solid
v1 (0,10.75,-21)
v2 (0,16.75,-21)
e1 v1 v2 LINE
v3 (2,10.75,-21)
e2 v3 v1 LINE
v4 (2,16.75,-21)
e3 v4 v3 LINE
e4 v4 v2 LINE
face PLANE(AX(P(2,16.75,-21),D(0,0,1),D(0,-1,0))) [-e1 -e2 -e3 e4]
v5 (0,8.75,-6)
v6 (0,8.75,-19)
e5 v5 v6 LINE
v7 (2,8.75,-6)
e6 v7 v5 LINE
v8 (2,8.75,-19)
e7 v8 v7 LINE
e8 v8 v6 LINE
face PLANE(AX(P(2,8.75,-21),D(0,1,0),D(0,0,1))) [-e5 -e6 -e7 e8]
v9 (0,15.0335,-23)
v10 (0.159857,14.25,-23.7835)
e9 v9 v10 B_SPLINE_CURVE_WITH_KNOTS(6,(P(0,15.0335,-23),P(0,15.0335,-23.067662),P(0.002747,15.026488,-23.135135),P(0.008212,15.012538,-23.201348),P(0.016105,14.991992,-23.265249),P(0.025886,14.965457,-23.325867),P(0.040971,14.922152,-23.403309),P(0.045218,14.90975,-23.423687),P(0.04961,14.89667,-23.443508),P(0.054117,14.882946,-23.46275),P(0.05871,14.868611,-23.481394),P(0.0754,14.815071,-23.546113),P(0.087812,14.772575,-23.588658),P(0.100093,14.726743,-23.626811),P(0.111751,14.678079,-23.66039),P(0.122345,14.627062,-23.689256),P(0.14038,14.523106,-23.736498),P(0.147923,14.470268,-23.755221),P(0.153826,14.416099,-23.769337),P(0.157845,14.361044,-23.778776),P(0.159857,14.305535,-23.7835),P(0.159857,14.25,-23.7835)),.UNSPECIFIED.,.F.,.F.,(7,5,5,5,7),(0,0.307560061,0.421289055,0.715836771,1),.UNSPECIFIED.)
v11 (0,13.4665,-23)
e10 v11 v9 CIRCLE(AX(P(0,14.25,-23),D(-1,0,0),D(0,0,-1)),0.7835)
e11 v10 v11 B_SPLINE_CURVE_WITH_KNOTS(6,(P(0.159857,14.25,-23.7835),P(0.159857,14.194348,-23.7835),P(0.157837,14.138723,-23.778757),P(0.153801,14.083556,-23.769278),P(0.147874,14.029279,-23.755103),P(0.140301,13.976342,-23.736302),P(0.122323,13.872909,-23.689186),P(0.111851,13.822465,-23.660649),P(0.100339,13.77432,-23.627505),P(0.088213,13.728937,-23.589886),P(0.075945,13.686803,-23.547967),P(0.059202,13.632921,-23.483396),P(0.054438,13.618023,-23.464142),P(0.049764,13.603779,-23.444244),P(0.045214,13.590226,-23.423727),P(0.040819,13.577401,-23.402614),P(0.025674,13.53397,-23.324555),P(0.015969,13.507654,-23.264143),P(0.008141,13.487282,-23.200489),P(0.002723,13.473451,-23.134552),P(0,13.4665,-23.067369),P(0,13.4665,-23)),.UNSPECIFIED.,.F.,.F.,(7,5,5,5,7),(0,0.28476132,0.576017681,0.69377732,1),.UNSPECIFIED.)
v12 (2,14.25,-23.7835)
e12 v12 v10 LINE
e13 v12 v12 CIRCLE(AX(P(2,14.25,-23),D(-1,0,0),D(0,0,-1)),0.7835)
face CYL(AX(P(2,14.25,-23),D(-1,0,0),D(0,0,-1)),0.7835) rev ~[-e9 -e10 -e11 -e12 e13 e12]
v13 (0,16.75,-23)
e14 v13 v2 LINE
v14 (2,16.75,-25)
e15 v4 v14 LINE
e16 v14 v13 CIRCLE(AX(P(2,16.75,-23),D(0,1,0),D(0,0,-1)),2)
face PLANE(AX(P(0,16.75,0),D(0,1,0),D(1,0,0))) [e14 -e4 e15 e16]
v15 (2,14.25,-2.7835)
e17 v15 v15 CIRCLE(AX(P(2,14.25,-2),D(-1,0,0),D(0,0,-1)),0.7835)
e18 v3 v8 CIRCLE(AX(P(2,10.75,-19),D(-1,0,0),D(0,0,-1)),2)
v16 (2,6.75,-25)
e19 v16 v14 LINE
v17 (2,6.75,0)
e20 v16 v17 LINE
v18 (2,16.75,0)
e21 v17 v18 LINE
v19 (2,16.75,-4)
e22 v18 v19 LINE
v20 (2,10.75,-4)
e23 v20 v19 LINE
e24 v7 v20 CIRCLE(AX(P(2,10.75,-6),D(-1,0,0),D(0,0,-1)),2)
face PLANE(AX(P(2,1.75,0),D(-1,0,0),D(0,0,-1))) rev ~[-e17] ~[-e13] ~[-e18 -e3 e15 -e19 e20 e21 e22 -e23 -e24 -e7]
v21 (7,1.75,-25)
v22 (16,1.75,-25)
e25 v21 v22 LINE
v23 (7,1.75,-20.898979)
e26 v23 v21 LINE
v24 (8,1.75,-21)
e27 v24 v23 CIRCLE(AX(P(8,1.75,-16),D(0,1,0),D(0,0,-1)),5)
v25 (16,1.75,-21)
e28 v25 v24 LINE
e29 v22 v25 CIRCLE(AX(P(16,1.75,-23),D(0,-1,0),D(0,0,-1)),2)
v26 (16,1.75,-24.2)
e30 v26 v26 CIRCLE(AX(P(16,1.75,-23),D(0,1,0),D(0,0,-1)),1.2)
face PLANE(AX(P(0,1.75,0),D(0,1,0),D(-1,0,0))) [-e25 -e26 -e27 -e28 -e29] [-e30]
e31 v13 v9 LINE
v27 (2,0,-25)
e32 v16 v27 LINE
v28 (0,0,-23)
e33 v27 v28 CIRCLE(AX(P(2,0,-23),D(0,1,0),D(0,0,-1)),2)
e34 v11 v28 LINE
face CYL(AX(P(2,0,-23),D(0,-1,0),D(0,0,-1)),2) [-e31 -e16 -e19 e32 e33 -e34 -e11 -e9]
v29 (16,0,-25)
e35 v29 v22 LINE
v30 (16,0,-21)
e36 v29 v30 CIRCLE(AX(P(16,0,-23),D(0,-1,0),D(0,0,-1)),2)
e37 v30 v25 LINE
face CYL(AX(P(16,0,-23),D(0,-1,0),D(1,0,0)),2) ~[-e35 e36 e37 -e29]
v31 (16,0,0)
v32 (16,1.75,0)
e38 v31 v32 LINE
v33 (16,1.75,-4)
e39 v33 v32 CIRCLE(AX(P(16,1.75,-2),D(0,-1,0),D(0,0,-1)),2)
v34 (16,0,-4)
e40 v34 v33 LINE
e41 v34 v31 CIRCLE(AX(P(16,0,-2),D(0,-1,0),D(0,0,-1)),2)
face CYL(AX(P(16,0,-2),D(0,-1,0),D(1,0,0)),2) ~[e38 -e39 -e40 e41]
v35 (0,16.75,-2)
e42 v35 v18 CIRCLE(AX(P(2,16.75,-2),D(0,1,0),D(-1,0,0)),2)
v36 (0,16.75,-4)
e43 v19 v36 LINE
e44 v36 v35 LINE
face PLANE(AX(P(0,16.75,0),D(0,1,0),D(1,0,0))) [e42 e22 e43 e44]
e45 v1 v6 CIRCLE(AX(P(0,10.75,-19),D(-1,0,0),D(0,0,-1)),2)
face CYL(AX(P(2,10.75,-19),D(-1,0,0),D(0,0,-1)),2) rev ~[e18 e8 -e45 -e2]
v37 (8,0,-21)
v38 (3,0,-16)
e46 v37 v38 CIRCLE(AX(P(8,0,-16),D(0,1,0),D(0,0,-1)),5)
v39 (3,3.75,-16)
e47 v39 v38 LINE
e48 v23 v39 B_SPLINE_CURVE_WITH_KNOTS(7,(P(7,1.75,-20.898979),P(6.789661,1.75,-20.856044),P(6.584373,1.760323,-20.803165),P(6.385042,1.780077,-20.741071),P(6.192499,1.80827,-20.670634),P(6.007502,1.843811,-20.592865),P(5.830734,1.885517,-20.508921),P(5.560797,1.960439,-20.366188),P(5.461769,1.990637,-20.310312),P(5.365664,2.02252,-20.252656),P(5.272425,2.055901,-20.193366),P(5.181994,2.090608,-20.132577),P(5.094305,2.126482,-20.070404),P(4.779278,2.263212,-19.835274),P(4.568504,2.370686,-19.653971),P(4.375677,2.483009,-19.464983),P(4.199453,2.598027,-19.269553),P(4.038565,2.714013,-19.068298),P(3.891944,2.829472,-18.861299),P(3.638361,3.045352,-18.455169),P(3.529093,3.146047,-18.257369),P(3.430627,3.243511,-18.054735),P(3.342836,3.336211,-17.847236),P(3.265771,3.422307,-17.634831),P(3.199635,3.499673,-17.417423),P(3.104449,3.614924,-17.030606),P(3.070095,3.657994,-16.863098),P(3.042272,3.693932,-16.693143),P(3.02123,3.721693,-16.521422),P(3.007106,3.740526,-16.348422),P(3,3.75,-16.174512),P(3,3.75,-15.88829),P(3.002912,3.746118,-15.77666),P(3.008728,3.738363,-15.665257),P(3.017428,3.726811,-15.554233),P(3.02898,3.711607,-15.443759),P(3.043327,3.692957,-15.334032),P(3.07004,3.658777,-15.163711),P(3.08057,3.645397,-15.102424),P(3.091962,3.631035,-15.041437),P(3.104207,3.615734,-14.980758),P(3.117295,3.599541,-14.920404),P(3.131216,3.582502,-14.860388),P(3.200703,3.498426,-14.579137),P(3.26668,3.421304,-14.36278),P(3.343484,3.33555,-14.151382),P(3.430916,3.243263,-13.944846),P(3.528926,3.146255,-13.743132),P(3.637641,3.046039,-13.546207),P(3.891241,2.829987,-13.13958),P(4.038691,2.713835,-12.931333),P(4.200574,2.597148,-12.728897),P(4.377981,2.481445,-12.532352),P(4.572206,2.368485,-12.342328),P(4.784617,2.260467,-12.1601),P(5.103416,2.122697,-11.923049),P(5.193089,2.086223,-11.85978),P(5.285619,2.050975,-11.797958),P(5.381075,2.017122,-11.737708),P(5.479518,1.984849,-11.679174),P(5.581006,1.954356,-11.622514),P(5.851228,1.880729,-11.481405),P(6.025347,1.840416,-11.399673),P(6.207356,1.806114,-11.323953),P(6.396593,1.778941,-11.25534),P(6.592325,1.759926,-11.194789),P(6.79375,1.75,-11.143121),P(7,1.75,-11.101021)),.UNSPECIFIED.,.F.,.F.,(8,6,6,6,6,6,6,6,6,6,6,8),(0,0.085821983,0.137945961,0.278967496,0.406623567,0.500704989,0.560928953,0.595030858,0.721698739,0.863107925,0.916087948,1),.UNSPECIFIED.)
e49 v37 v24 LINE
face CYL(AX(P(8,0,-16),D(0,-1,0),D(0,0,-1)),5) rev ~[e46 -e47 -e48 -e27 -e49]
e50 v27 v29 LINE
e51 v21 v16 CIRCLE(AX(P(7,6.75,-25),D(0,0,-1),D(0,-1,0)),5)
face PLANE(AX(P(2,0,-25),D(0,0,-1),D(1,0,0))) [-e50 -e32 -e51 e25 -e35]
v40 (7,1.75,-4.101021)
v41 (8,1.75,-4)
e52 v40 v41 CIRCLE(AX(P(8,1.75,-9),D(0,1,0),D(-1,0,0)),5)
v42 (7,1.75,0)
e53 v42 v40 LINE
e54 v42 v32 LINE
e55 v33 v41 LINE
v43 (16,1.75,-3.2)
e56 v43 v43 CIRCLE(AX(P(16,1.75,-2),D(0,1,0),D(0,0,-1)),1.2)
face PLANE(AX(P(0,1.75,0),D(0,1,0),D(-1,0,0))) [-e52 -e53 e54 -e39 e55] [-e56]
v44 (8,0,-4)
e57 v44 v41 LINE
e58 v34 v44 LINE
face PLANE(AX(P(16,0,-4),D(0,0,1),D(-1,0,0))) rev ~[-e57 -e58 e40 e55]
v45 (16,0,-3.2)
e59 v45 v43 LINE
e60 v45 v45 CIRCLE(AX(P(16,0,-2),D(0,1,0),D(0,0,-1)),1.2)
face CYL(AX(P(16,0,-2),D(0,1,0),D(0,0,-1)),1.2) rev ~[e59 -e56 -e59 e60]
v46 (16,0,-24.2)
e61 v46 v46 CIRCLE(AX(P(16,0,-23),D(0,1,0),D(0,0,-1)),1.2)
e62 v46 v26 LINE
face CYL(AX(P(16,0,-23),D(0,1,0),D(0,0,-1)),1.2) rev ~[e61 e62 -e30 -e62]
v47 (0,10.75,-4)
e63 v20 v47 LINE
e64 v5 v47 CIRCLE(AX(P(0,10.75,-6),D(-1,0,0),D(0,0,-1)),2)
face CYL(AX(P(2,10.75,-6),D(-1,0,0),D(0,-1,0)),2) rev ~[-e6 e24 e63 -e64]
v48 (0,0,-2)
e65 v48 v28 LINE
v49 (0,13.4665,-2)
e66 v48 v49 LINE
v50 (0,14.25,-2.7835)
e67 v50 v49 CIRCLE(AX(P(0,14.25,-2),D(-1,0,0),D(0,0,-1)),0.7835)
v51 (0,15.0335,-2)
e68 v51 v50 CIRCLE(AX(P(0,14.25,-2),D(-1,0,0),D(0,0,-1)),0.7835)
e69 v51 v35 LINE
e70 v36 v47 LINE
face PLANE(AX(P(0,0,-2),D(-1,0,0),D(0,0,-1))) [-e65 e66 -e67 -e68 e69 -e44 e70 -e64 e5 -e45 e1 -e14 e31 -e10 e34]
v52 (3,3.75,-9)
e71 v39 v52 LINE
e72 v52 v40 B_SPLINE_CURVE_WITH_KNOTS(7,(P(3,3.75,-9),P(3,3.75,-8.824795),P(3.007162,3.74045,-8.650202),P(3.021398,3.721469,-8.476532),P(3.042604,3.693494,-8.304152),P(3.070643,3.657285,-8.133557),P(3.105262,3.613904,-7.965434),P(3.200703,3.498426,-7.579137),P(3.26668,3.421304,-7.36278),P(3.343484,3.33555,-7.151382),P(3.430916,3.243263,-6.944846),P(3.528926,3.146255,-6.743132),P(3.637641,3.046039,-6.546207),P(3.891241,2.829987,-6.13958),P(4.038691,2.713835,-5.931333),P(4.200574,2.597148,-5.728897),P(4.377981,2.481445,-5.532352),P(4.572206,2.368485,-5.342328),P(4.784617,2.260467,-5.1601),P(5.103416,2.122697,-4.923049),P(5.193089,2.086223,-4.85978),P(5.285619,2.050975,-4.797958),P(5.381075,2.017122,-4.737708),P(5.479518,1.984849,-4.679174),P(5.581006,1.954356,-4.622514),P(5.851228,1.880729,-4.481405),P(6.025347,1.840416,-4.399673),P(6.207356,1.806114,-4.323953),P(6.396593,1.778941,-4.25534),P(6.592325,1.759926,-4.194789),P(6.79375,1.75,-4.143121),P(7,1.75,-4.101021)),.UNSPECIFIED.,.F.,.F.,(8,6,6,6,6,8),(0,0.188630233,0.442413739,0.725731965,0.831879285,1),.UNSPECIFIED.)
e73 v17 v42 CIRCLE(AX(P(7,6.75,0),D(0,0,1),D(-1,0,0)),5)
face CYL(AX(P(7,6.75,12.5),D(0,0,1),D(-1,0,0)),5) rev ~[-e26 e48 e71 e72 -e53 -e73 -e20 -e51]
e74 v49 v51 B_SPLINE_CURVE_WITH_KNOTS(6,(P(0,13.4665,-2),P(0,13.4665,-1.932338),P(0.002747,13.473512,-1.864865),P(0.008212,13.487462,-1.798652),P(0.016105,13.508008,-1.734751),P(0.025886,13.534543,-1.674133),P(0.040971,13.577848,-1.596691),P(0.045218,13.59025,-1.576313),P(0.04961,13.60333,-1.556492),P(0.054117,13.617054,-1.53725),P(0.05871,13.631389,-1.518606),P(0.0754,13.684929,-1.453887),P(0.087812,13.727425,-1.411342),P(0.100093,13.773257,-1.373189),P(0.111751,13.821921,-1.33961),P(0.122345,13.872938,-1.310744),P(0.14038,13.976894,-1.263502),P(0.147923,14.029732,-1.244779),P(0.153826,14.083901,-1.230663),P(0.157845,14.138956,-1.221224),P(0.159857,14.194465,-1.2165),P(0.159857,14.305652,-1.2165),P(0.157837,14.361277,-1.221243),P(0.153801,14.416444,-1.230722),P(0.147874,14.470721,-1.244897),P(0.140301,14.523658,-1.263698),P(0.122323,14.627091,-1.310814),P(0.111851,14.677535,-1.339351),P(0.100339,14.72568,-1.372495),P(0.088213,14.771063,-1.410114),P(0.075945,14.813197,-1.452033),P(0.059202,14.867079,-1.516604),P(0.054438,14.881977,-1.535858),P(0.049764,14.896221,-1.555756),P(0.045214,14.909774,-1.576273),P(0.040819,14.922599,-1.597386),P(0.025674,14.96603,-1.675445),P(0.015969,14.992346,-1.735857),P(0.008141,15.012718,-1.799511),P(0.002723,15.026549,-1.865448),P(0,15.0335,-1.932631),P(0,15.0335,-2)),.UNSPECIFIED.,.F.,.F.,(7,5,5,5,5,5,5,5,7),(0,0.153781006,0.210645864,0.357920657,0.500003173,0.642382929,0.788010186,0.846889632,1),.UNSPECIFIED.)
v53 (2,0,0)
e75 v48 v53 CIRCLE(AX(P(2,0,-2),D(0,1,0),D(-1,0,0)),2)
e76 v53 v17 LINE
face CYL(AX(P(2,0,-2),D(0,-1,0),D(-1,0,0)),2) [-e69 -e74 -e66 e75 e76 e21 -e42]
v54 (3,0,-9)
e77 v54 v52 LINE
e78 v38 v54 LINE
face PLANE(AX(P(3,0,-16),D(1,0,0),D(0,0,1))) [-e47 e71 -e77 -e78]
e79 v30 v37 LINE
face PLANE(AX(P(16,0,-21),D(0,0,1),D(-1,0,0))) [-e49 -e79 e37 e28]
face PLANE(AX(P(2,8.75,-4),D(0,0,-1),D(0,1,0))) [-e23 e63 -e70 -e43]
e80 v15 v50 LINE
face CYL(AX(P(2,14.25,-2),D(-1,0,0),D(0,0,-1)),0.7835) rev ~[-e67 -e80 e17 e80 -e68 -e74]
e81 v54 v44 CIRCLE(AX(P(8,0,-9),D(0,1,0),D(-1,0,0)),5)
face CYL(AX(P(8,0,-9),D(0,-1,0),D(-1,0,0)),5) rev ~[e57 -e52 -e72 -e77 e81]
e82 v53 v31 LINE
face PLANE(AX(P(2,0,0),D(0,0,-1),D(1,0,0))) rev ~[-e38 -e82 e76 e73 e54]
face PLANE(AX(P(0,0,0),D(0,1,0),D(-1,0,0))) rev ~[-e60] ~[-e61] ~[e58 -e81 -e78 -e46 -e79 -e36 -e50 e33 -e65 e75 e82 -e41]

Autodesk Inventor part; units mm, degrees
ref_plane "YZ Plane" through (0, 0, 0) normal (1, 0, 0) x (0, 1, 0)
ref_plane "XZ Plane" through (0, 0, 0) normal (0, 1, 0) x (-1, 0, 0)
ref_plane "XY Plane" through (0, 0, 0) normal (0, 0, 1) x (1, 0, 0)
sketch "Sketch1" plane through (0, 0, 0) normal (0, 1, 0) x (-1, 0, 0)
  line L0 (0, 0) -> (0, 0)
  line L1 (0, -2) -> (0, -23)
  line L2 (0, -25) -> (-1.1394, -25)
  line L3 (-3, -16) -> (-3, -9)
  line L4 (-2, 0) -> (-16, 0)
  line L5 (-18, -2) -> (-18, -2)
  line L6 (-16, -4) -> (-8, -4)
  line L7 (-2, -25) -> (-16, -25)
  line L8 (-18, -23) -> (-18, -23)
  line L9 (-16, -21) -> (-8, -21)
  arc A0 (-3, -9) -> (-8, -4) centre (-8, -9) ccw
  arc A1 (-8, -21) -> (-3, -16) centre (-8, -16) ccw
  arc A2 (-16, 0) -> (-18, -2) centre (-16, -2) ccw
  arc A3 (-18, -2) -> (-16, -4) centre (-16, -2) ccw
  arc A4 (-16, -21) -> (-18, -23) centre (-16, -23) ccw
  arc A5 (-18, -23) -> (-16, -25) centre (-16, -23) ccw
  arc A6 (0, -2) -> (-2, 0) centre (-2, -2) ccw
  arc A7 (-2, -25) -> (0, -23) centre (-2, -23) ccw
  point P0 (-18, -21)
  point P1 (-18, -25)
  point P2 (-16, -2)
  point P3 (-16, -23)
  dimension "d0" = 3
  dimension "d2" = 4
  dimension "d3" = 2
  dimension "d4" = 2
  dimension "d5" = 2
  dimension "d6" = 2
  dimension "d7" = 4
  dimension "d8" = 21
  dimension "d9" = 15
  dimension "d10" = 0
  dimension "d11" = 5
  dimension "d12" = 2
extrude "Extrusion1" add sketch "Sketch1" along normal blind 1.75
sketch "Sketch2" plane through (0, 1.75, 0) normal (0, 1, 0) x (1, 0, 0)
  arc A0 (0, 2) -> (2, 0) centre (2, 2) ccw projected
  line L0 (0, 23) -> (0, 2) projected
  arc A1 (2, 25) -> (0, 23) centre (2, 23) ccw projected
  line L1 (2, 0) -> (2, 25)
  point P0 (0, 0)
extrude "Extrusion2" add sketch "Sketch2" along normal blind 15
hole "Hole1" at (16, 0, -2) at (16, 0, -23) direction (0, 1, 0) diameter 2.4 depth 6.3 tip angle 118 clearance for "Flat Head Machine Screw" size "M2" standard "Ansi Metric M Profile"
fillet "Fillet1" radius 5 1 edges at (2, 1.75, -12.5)
sketch "Sketch3" plane through (2, 16.75, 0) normal (1, 0, 0) x (0, 0, -1)
  line L0 (2, -2.5) -> (23, -2.5) construction
  line L1 (25, -10) -> (25, 0) projected
  line L2 (0, -10) -> (0, 0) projected
  line L3 (0, 0) -> (25, 0) projected
  point P0 (0, -16.75)
  dimension "d25" = 21
  dimension "d26" = 25
  dimension "d27" = 2
  dimension "d28" = 2.5
hole "Hole2" at (2, 14.25, -2) at (2, 14.25, -23) direction (-1, 0, 0) diameter 1.567 depth 6.3 tip angle 118 thread size "M2x0.4" class "6H" standard "ANSI Metric M Profile"
sketch "Sketch4" plane through (2, 16.75, 0) normal (1, 0, 0) x (0, 0, -1)
  line L0 (0, 0) -> (25, 0) projected
  line L1 (4, 0) -> (21, 0)
  line L2 (21, 0) -> (21, -8)
  line L3 (21, -8) -> (4, -8)
  line L4 (4, -8) -> (4, 0)
  line L5 (25, -10) -> (25, 0) projected
  line L6 (0, -10) -> (0, 0) projected
  point P0 (0, -16.75)
  dimension "d36" = 8
  dimension "d37" = 25
  dimension "d38" = 4
  dimension "d39" = 4
extrude "Extrusion3" cut sketch "Sketch4" against normal blind 10
fillet "Fillet2" radius 2 2 edges at (1, 8.75, -4) (1, 8.75, -21)
equation "\"d3\" = 0.5 * d2"
equation "\"d4\" = d3"
equation "\"d5\" = d3"
equation "\"d6\" = d4"
equation "\"d7\" = d2"
equation "\"d27\" = -0.5 * d25 + 0.5 * d26"
equation "\"d39\" = d38"
properties part number "pi_camera_mount"
